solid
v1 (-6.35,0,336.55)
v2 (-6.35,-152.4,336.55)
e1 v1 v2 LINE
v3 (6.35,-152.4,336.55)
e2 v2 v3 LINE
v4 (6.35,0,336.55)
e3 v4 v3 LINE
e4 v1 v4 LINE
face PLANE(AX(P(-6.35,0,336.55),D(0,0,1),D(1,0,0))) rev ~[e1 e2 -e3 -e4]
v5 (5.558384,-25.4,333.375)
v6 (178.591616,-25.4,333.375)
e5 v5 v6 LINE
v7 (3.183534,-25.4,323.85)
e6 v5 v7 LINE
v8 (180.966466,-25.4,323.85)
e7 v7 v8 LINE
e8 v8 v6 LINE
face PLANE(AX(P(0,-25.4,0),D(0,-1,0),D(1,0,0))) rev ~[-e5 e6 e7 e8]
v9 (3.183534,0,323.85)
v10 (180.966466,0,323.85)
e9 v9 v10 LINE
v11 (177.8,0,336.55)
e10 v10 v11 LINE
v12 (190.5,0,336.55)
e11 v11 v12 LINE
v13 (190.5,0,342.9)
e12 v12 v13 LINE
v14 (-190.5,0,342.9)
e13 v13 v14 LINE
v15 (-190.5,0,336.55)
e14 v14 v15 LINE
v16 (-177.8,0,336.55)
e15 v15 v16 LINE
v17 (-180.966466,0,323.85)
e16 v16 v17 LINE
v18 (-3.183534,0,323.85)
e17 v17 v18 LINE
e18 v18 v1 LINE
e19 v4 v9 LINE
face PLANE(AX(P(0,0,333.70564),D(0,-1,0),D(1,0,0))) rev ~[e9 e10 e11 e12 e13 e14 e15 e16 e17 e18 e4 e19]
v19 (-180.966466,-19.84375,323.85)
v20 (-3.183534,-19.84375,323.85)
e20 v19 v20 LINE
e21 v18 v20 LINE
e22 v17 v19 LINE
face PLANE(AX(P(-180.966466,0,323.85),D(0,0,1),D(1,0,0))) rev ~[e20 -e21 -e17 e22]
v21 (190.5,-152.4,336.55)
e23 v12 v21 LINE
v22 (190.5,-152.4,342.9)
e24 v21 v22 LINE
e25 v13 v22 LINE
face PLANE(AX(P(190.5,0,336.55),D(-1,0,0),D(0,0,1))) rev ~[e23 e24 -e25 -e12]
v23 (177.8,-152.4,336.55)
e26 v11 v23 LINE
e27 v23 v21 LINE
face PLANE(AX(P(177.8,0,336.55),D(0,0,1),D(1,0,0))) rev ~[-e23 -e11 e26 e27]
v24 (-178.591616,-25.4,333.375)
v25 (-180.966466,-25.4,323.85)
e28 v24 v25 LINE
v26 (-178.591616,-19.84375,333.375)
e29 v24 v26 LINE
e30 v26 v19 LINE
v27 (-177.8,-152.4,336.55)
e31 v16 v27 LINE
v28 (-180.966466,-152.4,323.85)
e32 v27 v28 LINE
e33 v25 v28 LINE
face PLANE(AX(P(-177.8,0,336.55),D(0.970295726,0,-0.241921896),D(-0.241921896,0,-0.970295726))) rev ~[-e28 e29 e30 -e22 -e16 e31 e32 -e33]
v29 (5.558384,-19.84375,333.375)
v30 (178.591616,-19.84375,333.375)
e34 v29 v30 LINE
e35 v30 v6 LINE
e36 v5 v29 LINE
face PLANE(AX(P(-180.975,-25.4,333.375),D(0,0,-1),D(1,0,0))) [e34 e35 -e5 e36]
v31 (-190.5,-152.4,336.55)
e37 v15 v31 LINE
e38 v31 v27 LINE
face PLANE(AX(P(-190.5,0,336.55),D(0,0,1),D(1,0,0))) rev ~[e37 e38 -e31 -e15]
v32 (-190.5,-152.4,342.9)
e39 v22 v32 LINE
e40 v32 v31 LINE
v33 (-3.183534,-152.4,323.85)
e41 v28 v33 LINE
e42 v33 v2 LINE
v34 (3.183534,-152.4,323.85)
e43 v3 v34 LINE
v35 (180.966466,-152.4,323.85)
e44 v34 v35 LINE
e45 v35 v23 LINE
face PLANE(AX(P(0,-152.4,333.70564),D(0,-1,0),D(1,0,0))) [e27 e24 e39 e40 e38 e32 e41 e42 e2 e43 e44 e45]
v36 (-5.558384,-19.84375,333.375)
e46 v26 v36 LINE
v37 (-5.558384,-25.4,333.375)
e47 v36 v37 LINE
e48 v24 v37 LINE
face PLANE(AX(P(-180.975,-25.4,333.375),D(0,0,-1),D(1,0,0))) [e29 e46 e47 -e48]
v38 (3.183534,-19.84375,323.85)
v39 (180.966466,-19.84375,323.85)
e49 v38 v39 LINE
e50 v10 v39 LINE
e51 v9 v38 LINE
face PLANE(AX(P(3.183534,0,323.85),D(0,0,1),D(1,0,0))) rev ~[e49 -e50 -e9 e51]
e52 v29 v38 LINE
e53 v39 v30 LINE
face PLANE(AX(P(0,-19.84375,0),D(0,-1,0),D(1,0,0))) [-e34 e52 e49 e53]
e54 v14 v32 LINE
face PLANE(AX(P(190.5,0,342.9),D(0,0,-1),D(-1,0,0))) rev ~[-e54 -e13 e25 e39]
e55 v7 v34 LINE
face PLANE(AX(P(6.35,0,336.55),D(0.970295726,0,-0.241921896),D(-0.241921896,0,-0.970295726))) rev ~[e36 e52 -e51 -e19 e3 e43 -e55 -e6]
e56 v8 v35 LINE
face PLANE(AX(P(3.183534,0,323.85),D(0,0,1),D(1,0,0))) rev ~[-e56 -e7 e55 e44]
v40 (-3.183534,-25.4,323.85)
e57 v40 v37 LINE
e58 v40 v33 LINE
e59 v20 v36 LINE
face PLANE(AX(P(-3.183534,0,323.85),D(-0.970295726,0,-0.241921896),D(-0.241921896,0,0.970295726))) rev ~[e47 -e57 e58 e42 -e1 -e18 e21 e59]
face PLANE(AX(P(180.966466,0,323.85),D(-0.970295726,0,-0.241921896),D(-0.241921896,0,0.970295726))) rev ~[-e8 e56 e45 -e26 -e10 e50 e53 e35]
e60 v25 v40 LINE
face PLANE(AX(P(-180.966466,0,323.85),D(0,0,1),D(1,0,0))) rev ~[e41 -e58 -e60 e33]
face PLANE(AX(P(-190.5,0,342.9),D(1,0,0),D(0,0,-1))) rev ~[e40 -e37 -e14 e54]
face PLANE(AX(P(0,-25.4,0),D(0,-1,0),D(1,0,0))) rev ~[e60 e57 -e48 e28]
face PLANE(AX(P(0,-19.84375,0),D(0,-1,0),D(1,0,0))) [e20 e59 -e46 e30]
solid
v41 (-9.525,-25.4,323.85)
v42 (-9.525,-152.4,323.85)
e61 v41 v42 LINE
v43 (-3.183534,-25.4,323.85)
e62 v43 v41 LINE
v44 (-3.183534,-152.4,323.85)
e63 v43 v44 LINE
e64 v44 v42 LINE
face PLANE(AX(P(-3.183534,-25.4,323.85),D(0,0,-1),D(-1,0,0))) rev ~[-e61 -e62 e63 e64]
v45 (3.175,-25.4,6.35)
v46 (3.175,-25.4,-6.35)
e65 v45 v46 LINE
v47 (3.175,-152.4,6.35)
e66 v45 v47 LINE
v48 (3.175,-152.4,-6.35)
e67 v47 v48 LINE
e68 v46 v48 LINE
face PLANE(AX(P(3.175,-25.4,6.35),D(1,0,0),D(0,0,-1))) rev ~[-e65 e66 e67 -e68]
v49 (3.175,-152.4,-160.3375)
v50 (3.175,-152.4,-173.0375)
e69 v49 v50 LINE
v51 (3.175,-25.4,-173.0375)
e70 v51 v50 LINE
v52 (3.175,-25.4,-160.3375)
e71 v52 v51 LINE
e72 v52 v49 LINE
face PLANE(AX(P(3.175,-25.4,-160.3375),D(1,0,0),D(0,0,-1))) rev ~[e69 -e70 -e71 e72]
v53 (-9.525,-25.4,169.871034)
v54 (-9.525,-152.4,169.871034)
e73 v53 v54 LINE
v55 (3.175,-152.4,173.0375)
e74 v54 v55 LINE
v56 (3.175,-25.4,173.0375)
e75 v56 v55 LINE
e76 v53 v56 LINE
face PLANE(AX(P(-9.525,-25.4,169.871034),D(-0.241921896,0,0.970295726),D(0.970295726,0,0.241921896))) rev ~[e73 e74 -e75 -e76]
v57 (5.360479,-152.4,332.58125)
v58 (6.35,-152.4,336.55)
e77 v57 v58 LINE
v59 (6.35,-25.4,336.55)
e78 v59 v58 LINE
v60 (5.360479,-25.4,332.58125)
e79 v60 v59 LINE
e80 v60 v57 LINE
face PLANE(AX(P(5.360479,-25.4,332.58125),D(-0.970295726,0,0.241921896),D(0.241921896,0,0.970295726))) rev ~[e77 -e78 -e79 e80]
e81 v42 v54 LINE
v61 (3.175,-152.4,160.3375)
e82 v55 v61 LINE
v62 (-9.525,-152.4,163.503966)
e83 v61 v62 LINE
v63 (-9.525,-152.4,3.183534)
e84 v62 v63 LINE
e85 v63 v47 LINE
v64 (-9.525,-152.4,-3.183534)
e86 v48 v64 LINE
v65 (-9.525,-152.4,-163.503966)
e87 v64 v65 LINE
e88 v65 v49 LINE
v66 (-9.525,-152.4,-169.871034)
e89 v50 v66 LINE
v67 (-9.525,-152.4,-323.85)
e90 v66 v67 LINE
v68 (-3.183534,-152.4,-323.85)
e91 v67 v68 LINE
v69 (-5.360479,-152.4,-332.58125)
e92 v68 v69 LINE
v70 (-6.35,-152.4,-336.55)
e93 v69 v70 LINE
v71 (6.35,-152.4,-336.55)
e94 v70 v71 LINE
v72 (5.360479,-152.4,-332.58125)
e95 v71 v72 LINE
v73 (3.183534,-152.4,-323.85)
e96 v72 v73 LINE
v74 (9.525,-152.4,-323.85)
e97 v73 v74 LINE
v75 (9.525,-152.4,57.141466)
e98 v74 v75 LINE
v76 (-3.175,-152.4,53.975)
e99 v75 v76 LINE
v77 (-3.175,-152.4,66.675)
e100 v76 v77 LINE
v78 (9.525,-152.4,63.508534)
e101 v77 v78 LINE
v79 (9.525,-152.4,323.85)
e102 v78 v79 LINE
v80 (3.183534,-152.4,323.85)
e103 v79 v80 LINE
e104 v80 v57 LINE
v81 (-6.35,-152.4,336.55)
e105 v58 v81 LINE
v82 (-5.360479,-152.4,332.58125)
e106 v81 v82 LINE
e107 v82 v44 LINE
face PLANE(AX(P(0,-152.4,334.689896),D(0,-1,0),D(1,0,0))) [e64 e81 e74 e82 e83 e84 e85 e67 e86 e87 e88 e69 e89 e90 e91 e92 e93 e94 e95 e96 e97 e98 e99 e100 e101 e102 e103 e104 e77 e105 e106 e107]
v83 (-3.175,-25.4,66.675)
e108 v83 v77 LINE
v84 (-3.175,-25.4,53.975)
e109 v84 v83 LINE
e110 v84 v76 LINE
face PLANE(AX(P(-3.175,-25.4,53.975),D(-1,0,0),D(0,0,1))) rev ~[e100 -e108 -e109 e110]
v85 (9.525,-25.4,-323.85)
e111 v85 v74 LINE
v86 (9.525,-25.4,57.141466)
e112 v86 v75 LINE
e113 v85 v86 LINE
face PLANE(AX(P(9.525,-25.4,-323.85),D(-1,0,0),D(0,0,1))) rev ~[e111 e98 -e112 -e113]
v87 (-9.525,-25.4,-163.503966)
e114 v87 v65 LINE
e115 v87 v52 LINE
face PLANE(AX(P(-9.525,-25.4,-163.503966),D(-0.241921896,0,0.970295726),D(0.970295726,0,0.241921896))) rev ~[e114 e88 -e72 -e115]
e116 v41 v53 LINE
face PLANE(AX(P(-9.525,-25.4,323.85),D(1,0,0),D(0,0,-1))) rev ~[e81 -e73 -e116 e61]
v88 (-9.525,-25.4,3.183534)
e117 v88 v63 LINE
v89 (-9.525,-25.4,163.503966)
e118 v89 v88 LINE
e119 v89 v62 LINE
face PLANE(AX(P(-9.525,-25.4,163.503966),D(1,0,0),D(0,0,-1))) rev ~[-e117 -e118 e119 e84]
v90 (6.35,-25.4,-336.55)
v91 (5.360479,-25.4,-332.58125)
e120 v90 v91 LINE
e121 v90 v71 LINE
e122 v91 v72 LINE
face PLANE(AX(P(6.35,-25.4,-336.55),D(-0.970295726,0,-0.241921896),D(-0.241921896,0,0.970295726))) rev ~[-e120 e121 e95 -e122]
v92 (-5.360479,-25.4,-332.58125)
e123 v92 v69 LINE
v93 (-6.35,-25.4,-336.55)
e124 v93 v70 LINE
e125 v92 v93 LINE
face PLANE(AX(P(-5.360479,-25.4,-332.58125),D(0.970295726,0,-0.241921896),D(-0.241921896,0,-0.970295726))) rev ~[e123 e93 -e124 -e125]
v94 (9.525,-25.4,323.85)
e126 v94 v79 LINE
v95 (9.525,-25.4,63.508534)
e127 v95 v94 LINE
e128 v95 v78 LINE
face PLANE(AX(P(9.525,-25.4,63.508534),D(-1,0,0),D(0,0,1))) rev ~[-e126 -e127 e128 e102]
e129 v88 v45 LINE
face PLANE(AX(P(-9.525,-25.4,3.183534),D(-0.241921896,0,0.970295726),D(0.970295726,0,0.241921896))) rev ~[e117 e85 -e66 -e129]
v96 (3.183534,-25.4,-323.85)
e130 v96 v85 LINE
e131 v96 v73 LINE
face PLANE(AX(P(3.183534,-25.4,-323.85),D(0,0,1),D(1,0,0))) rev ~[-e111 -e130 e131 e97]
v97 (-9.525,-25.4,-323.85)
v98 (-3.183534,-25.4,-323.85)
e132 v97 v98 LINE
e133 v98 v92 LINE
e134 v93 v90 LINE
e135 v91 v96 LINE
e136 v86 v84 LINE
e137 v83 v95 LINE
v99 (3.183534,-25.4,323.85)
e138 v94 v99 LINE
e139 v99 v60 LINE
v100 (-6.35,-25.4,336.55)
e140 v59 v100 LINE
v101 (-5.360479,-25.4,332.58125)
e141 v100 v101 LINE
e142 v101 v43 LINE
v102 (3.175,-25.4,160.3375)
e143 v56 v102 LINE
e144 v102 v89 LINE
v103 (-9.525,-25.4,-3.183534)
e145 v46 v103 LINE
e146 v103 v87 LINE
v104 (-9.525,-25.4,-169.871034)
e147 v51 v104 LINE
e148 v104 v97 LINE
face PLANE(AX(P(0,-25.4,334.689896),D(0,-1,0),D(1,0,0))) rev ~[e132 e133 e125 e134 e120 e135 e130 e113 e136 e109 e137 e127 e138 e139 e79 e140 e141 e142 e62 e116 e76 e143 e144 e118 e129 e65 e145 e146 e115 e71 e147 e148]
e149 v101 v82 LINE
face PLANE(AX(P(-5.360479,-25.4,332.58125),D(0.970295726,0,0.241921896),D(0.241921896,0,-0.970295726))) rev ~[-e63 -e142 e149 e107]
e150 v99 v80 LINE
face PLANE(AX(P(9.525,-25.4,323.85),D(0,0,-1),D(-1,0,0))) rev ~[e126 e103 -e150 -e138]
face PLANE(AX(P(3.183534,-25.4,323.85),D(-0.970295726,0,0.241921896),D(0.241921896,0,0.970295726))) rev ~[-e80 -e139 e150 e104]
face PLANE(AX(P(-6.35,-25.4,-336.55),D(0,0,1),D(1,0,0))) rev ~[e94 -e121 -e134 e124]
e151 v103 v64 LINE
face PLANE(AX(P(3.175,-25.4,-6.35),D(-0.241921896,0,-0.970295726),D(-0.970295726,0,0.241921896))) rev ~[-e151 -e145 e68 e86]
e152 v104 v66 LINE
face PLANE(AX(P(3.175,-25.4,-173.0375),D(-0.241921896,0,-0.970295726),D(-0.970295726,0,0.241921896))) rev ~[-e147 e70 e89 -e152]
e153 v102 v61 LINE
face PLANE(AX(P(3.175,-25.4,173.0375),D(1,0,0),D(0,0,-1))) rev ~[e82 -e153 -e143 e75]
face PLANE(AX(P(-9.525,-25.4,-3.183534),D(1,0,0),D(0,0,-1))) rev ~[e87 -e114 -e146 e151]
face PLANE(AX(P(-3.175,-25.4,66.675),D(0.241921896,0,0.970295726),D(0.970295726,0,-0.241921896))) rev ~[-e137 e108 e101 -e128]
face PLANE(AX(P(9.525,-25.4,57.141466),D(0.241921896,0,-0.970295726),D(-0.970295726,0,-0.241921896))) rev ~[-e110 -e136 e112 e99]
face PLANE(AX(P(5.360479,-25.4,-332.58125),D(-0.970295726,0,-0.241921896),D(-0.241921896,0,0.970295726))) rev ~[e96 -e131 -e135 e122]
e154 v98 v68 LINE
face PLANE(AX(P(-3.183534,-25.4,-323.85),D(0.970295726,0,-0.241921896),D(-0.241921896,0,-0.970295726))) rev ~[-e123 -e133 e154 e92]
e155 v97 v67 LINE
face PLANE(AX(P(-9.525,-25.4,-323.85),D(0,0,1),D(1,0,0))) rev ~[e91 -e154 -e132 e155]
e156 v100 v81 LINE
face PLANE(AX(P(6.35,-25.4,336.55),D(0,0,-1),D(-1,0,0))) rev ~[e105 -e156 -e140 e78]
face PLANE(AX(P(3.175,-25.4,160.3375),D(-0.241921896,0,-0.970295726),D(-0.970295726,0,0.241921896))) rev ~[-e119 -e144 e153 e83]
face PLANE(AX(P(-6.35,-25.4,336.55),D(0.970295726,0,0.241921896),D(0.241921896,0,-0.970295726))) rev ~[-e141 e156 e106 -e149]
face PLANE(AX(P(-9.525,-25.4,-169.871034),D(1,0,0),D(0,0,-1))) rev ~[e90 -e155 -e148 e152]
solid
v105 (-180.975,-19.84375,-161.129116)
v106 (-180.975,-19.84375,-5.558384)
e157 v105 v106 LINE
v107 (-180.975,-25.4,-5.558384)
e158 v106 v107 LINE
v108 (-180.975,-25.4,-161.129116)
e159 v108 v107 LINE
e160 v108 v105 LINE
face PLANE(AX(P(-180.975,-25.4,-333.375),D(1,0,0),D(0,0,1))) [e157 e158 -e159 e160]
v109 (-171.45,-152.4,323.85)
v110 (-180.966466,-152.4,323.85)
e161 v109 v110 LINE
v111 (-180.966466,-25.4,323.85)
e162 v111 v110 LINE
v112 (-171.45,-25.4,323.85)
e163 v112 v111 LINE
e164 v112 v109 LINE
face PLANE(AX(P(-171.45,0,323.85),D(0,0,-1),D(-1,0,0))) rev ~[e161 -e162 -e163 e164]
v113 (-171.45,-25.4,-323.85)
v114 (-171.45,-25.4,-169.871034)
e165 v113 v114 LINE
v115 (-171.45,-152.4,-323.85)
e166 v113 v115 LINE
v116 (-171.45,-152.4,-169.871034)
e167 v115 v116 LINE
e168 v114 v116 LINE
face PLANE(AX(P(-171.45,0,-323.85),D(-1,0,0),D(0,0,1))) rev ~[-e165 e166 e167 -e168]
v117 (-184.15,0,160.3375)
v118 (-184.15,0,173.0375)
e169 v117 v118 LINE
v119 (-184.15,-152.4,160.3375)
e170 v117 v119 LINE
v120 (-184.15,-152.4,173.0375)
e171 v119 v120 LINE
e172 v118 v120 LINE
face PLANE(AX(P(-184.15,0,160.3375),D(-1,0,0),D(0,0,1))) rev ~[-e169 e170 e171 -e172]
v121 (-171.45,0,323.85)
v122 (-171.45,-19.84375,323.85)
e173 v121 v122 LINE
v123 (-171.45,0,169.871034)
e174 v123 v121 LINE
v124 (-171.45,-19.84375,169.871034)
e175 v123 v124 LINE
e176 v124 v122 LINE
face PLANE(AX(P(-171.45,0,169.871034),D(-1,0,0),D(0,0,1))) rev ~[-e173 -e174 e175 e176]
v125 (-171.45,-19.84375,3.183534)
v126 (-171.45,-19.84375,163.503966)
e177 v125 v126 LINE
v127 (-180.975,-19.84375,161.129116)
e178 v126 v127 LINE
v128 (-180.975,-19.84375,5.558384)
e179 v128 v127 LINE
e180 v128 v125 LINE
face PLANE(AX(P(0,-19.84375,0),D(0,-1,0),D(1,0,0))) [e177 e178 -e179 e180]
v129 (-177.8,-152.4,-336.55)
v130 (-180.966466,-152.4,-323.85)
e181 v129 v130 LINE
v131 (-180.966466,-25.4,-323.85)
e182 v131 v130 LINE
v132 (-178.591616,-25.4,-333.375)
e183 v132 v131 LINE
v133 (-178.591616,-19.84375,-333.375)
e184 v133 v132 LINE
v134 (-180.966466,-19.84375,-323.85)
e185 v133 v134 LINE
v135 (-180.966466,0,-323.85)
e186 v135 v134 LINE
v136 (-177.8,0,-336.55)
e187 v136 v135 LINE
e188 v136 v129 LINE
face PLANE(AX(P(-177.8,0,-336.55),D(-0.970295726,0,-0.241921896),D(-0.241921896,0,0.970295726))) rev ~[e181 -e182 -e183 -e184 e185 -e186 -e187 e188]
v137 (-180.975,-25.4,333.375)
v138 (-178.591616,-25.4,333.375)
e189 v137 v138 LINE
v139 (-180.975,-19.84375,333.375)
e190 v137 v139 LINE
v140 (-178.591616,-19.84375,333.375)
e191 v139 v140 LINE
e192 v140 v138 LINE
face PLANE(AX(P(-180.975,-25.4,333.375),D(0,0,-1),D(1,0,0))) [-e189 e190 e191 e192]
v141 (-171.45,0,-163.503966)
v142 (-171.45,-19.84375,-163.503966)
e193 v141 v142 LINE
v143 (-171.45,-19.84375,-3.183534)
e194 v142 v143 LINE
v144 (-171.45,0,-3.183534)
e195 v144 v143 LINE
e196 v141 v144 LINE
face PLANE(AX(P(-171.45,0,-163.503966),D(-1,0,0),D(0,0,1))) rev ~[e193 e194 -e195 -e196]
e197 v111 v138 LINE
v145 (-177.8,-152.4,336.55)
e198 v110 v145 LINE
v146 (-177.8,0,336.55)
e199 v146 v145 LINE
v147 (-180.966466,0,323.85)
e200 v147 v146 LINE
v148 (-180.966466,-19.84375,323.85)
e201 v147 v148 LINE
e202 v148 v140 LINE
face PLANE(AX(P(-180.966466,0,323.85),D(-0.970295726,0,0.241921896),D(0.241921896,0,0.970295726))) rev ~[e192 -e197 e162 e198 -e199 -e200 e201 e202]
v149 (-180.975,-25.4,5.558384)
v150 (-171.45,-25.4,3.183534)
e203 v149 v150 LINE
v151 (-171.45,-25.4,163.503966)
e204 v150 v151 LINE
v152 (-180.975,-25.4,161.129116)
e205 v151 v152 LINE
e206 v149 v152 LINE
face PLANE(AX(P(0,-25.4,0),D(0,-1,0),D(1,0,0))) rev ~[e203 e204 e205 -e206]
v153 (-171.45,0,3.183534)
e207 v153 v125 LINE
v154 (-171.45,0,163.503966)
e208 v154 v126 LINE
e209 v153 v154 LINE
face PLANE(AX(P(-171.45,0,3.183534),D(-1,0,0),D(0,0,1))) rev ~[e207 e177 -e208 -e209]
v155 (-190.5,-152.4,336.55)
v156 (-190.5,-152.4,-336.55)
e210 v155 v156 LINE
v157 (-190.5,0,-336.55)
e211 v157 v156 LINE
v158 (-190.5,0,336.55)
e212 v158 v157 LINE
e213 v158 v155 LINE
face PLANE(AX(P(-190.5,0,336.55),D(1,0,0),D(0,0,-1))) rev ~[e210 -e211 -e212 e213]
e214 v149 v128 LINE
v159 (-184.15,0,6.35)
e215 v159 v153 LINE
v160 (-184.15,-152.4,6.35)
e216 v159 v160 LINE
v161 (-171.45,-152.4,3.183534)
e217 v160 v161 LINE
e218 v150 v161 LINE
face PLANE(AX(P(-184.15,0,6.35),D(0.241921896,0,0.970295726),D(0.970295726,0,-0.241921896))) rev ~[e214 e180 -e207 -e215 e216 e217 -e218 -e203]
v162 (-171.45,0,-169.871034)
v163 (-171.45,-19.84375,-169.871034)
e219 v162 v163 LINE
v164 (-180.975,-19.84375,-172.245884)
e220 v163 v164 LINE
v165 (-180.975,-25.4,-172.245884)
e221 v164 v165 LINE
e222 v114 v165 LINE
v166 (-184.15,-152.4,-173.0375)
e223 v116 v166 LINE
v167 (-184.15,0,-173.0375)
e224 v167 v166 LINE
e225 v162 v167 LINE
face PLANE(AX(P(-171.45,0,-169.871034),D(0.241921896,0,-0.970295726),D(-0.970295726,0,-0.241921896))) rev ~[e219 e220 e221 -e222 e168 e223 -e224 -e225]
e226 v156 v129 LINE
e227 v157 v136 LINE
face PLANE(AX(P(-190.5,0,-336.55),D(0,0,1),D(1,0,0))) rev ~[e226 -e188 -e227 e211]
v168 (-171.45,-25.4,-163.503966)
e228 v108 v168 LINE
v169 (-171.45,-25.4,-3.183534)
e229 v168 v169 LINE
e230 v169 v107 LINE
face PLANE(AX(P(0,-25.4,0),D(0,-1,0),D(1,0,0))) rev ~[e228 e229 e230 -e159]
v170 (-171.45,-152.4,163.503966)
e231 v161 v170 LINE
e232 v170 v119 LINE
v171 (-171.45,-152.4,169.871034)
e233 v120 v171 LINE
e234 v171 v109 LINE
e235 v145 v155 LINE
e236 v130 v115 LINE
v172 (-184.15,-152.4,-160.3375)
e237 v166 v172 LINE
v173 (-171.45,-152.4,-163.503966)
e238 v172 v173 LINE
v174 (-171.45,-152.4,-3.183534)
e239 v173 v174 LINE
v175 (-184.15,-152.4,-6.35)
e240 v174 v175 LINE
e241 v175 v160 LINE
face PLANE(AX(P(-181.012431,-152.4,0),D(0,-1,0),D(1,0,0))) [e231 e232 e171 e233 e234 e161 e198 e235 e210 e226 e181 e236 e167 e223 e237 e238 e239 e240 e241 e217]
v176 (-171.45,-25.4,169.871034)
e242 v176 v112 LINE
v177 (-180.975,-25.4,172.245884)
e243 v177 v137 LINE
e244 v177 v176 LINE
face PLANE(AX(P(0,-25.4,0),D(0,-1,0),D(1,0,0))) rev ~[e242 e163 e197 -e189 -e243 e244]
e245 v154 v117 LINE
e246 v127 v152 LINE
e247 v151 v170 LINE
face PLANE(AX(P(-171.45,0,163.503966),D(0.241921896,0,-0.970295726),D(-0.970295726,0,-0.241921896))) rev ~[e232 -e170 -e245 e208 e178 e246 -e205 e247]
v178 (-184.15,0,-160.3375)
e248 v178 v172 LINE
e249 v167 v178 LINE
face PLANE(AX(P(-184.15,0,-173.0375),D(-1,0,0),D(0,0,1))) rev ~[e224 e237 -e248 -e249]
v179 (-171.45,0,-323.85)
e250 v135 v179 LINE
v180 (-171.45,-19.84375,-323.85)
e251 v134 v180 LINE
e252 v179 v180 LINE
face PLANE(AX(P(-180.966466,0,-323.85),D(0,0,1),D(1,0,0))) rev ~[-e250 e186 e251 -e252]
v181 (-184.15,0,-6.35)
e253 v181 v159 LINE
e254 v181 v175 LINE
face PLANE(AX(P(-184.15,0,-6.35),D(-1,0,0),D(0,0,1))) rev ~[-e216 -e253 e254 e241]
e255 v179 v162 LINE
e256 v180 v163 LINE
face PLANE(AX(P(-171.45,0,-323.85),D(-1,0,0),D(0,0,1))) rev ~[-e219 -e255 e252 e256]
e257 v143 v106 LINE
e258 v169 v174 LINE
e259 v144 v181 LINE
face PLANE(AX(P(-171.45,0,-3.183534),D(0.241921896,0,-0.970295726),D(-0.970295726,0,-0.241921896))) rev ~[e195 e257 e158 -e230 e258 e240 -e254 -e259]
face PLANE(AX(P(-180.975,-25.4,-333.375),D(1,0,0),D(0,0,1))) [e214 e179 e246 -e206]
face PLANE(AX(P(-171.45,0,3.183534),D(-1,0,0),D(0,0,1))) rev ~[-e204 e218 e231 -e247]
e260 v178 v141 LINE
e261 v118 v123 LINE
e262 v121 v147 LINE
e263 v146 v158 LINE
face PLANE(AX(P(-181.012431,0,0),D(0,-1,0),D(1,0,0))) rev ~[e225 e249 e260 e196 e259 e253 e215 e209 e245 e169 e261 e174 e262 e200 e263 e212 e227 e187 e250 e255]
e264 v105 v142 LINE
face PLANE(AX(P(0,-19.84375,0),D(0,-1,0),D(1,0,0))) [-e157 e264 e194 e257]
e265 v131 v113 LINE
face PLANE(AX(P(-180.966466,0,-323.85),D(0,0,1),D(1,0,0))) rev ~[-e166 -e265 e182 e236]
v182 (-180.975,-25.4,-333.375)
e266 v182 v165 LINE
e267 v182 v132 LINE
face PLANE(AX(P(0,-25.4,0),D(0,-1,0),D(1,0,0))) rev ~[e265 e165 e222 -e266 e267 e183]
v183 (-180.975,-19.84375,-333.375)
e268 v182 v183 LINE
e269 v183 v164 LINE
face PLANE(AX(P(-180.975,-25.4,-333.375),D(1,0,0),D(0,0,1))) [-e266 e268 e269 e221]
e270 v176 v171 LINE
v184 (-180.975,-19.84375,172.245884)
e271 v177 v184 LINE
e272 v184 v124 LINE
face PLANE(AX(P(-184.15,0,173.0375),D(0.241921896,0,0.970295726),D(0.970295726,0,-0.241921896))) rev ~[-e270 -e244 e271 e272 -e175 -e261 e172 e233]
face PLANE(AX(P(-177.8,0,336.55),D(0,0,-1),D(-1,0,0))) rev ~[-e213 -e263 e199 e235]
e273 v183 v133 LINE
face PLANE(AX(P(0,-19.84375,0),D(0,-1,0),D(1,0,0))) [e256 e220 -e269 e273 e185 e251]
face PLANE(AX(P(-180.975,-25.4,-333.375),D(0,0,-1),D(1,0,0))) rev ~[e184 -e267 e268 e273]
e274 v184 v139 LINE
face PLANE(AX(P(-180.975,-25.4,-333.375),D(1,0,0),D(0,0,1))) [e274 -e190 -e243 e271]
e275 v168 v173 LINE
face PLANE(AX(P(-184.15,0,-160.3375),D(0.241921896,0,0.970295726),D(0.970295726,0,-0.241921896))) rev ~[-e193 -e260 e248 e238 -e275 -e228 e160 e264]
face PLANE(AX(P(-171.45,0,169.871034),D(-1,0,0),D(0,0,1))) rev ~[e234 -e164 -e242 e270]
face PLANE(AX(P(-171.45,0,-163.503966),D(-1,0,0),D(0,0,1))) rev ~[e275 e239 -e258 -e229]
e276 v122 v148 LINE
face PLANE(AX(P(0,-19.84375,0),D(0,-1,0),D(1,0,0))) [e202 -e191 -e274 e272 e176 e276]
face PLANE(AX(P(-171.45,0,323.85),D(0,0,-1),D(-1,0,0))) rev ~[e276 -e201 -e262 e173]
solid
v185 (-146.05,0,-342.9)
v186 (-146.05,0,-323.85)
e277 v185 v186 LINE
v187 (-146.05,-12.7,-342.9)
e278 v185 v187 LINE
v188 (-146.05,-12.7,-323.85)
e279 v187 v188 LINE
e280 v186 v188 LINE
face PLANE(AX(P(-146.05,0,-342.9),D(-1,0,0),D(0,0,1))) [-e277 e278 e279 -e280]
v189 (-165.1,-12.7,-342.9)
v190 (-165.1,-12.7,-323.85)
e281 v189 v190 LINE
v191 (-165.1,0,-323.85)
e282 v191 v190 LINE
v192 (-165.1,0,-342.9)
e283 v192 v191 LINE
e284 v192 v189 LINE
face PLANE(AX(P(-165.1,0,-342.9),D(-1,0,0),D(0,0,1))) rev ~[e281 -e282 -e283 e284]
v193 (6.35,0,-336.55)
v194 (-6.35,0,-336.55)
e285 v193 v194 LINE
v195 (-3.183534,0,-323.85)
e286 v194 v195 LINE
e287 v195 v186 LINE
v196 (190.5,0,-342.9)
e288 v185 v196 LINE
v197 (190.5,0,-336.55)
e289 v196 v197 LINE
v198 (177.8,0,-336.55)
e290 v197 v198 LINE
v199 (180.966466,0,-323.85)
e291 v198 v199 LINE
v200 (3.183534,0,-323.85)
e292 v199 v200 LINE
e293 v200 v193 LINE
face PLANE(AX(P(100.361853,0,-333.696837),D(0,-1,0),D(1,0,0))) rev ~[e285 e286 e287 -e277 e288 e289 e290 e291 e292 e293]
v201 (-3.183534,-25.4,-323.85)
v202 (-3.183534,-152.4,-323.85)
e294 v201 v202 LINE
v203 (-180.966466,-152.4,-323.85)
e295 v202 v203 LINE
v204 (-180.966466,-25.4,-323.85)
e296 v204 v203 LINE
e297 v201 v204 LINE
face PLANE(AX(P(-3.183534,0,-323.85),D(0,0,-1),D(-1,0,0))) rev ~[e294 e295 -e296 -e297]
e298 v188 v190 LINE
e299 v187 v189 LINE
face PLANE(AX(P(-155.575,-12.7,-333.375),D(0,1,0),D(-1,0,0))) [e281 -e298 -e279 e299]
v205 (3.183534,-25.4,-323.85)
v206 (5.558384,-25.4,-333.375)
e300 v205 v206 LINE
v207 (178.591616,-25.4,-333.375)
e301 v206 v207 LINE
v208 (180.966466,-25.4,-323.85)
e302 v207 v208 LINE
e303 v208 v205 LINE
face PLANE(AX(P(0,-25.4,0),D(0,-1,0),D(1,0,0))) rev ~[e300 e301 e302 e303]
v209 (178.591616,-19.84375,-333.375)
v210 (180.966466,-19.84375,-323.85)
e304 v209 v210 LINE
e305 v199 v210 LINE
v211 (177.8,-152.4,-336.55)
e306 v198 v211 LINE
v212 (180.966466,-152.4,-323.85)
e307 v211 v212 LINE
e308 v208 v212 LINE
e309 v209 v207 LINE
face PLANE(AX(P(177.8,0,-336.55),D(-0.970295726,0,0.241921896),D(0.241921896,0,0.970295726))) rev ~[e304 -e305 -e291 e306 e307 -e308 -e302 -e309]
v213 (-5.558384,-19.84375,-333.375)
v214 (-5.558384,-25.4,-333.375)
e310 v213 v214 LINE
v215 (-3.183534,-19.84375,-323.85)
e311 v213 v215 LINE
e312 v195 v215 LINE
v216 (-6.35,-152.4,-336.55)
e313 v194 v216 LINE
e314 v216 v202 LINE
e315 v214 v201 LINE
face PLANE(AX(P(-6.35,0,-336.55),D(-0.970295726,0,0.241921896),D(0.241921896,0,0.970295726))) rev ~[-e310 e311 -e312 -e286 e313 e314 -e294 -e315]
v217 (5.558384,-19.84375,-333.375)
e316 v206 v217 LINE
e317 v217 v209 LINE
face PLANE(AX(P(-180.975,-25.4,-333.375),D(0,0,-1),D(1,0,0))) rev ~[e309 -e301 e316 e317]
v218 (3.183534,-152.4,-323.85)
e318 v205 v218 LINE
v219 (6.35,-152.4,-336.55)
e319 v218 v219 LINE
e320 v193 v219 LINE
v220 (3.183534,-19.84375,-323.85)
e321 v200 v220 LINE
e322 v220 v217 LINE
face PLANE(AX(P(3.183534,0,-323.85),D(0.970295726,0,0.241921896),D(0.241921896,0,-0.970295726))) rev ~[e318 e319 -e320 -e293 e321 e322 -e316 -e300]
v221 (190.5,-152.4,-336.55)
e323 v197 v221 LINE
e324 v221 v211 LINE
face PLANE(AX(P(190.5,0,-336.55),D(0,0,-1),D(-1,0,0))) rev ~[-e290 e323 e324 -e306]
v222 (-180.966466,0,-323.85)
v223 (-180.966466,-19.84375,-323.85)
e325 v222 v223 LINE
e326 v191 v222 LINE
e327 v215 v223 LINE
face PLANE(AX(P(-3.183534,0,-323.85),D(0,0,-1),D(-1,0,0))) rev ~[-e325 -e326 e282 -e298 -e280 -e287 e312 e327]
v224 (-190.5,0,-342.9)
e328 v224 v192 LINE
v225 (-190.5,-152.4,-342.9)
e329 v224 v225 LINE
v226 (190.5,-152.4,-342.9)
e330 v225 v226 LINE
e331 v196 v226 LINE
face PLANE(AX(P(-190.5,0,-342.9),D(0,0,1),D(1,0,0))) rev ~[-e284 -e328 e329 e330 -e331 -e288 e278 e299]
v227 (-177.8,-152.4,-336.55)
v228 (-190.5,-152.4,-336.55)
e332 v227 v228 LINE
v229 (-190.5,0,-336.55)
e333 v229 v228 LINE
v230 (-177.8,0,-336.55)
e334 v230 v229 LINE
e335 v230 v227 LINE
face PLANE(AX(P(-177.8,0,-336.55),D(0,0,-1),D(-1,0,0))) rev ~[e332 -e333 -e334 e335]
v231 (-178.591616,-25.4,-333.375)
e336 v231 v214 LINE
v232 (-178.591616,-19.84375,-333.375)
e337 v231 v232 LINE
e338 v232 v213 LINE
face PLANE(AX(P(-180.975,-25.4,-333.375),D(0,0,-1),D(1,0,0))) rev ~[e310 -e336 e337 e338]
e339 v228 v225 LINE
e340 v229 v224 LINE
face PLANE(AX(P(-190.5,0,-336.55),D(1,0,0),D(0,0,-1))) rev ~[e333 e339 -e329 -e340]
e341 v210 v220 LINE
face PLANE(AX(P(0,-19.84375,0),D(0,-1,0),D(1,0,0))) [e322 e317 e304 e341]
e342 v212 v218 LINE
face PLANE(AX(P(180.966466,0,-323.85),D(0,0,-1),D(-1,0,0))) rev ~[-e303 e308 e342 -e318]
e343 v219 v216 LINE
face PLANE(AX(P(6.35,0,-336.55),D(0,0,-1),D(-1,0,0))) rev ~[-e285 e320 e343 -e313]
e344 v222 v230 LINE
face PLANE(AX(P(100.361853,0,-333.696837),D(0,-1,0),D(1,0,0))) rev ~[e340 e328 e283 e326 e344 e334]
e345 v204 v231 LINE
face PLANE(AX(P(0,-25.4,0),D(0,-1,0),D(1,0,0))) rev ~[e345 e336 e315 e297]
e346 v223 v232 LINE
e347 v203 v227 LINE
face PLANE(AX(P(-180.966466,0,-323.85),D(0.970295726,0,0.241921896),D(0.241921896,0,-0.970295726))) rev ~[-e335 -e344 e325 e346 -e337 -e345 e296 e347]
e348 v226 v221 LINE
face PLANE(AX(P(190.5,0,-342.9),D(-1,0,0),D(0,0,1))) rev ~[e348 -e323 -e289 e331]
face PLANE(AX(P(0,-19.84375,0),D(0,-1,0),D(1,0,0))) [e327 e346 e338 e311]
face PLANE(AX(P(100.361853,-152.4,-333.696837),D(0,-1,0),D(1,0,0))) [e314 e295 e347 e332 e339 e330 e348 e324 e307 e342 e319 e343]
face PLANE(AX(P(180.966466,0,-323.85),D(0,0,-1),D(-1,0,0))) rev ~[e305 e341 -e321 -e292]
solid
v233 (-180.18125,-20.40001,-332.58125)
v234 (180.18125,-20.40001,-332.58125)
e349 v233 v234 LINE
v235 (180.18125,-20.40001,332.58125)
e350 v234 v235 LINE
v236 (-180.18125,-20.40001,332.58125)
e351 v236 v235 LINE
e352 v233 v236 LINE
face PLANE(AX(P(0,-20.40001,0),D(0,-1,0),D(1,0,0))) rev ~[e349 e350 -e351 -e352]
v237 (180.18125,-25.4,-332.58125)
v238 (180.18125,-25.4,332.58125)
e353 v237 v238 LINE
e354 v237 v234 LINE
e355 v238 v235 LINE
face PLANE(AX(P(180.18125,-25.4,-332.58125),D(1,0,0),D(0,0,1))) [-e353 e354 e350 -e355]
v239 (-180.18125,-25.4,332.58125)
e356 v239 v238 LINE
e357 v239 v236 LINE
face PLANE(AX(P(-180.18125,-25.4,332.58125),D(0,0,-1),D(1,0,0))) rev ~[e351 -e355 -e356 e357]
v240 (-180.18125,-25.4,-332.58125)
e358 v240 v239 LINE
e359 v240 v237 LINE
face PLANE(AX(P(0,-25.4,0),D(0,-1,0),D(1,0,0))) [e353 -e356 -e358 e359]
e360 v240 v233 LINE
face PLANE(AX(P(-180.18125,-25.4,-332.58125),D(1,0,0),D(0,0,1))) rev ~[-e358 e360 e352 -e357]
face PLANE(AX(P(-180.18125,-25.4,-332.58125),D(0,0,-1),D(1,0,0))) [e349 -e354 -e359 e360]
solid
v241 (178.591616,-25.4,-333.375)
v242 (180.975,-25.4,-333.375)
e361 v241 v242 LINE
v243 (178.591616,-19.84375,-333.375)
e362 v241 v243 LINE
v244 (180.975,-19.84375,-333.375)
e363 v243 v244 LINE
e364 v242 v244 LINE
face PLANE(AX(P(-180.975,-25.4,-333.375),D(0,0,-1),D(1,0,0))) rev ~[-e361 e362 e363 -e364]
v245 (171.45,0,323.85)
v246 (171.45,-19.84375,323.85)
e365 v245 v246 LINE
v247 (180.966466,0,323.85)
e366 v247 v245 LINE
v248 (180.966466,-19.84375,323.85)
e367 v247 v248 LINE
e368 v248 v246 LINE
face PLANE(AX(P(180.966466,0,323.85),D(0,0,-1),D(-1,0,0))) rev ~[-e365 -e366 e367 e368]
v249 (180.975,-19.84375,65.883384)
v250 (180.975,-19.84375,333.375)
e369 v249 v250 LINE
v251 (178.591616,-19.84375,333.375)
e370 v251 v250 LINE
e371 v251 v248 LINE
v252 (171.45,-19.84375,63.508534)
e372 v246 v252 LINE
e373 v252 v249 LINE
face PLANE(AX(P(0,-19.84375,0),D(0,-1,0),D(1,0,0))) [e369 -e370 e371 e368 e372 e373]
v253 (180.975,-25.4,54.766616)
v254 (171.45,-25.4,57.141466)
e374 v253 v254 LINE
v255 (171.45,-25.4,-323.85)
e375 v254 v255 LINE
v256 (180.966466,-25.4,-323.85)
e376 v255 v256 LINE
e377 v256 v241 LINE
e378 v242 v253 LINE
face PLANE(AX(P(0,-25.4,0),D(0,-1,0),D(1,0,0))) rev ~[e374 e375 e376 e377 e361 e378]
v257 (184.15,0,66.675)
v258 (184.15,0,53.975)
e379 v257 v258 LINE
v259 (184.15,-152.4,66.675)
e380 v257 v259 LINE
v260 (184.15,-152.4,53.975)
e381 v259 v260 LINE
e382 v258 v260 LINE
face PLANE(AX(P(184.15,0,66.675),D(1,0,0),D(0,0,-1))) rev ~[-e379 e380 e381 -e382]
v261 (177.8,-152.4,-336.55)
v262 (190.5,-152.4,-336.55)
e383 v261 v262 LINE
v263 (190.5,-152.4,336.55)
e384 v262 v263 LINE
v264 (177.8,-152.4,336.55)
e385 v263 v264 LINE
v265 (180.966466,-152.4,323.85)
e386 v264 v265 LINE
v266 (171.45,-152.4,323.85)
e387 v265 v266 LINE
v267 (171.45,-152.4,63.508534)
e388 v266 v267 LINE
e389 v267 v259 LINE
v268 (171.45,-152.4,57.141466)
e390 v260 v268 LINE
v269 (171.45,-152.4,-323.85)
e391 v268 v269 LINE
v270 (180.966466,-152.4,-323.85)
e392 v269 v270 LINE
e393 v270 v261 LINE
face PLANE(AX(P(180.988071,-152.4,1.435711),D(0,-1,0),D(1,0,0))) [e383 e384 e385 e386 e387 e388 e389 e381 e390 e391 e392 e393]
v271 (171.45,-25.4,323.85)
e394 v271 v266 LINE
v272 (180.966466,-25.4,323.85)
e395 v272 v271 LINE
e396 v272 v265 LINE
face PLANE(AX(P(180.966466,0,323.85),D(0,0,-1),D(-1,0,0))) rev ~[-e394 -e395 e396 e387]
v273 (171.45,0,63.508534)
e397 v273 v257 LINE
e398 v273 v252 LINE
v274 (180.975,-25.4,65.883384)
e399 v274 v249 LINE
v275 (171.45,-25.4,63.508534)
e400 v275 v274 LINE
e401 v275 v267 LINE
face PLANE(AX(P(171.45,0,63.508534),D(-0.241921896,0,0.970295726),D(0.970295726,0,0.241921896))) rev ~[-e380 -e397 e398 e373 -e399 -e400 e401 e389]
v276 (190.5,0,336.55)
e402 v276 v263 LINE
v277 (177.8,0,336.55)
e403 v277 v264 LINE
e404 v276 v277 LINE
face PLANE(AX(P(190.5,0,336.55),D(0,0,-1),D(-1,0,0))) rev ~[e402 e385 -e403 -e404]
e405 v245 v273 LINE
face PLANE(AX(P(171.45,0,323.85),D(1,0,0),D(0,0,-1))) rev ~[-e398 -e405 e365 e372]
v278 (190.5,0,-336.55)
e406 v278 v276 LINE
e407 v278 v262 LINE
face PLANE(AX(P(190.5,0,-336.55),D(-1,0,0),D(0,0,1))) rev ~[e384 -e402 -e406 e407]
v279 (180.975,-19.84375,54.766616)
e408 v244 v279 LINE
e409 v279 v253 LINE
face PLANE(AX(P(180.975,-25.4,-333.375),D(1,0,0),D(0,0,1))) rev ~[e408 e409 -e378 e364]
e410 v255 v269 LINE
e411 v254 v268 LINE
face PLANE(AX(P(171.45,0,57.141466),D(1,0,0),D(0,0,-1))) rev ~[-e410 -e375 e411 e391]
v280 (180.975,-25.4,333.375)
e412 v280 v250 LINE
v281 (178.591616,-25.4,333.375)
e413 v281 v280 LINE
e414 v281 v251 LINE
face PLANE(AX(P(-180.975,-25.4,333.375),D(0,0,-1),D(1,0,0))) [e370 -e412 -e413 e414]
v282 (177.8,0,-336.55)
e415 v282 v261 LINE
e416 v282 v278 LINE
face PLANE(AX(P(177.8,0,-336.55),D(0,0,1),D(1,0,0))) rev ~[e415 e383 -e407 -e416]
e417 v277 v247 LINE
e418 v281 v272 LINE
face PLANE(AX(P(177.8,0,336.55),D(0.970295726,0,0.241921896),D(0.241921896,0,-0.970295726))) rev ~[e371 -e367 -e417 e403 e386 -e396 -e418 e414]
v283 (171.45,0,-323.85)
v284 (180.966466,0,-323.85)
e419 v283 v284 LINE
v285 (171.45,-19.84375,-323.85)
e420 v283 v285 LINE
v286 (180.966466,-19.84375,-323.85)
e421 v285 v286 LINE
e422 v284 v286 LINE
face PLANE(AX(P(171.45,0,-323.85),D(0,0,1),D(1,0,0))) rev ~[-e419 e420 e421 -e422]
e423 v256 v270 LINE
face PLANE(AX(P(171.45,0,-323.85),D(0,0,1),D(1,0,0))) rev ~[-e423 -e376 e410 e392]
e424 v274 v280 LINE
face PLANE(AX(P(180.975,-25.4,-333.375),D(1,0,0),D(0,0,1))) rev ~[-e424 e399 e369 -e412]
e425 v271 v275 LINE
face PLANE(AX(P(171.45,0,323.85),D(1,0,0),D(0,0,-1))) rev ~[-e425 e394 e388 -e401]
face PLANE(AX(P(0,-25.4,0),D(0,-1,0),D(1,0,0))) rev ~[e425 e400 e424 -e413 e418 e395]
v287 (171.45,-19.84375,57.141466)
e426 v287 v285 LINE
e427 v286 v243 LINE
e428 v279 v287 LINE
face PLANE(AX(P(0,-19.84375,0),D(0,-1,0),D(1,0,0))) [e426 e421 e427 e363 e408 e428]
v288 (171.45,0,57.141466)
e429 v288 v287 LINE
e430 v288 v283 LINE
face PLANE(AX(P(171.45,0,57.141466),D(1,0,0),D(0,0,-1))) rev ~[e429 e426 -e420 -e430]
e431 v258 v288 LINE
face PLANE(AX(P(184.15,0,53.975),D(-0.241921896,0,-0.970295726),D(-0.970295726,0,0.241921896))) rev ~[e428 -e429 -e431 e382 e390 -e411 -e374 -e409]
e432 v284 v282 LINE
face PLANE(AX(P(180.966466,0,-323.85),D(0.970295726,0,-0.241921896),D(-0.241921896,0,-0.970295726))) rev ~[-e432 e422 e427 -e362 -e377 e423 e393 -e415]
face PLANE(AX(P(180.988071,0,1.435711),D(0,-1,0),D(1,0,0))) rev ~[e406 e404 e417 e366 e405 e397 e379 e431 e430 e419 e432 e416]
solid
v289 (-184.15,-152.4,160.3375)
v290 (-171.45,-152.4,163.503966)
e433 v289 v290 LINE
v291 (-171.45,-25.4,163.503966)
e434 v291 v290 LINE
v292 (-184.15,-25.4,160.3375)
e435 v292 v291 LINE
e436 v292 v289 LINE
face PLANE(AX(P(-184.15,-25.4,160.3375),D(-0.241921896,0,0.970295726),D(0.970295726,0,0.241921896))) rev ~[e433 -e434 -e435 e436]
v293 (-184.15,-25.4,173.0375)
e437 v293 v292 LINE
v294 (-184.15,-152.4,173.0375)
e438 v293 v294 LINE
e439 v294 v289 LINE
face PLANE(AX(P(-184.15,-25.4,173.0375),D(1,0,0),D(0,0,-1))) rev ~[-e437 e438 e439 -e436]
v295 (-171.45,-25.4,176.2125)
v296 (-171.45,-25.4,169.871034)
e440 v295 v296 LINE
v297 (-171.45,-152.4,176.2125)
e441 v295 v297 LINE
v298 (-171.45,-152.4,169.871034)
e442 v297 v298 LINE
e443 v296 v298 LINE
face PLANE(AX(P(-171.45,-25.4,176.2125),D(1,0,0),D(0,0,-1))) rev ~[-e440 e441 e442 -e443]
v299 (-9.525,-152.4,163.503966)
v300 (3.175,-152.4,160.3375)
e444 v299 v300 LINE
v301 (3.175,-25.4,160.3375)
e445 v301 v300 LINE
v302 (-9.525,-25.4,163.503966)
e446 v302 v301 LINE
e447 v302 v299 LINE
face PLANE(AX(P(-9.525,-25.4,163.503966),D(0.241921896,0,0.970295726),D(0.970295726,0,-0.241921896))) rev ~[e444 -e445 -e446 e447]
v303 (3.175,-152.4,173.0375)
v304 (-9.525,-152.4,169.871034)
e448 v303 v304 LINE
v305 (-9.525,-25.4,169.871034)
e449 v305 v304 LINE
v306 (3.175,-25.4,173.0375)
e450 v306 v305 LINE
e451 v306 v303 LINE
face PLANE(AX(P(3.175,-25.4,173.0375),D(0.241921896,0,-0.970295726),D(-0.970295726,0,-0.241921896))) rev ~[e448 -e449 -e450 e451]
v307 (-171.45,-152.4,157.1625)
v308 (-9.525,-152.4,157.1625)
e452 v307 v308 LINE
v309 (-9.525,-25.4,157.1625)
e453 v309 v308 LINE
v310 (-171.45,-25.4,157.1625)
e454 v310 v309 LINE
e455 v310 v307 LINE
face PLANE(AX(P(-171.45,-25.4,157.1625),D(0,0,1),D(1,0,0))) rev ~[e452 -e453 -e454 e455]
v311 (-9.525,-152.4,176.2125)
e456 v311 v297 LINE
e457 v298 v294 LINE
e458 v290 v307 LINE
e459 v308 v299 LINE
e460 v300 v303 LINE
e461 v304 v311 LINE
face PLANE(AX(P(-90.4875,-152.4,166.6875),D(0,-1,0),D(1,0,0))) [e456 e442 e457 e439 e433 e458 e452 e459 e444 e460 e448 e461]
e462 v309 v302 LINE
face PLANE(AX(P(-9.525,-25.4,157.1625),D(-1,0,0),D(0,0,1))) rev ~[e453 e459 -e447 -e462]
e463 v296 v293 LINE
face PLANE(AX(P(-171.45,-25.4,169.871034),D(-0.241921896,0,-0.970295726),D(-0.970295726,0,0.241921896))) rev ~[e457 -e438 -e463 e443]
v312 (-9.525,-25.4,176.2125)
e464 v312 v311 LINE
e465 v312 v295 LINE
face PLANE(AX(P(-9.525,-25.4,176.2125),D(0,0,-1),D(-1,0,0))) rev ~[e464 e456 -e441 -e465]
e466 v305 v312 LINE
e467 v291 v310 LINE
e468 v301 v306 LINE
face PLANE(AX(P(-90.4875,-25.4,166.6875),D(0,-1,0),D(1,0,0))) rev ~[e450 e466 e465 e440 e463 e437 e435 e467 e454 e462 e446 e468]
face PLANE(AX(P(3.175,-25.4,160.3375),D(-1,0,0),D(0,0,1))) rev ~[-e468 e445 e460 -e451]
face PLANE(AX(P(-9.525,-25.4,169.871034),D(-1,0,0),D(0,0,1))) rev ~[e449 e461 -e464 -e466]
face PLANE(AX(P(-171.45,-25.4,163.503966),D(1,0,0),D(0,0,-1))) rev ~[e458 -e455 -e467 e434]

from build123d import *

# Parameters (mm, degrees)
F1_DEPTH  = 152.4
F2_DEPTH  = 152.4
F3_W      = 19.05
F3_H      = 19.05
F4_DEPTH  = 12.7
F6_W      = 361.95
F6_H      = 666.75
F7_DEPTH  = 5.55625
F8_W      = 360.3625
F8_H      = 665.1625
F9_DEPTH  = 4.99999
F11_DEPTH = 127
F13_DEPTH = 127


# Not quite as in the source:
# - a feature names something its author has since deleted; it is built from what else it names


with BuildPart() as f1:
    # F0 (on Front) → F1 (new body)
    with BuildSketch(Plane.XZ):
        Polygon((-180.9664656361, 323.85), (-190.5, 323.85), (-190.5, -323.85), (-180.9664656361, -323.85), (-171.45, -323.85), (-171.45, -176.2125), (-171.45, -169.8710343639), (-184.15, -173.0375), (-184.15, -160.3375), (-171.45, -163.5039656361), (-171.45, -157.1625), (-171.45, -9.525), (-171.45, -3.1835343639), (-184.15, -6.35), (-184.15, 6.35), (-171.45, 3.1835343639), (-171.45, 9.525), (-171.45, 157.1625), (-171.45, 163.5039656361), (-184.15, 160.3375), (-184.15, 173.0375), (-171.45, 169.8710343639), (-171.45, 176.2125), (-171.45, 323.85), align=None)
        Polygon((-177.8, 336.55), (-190.5, 336.55), (-190.5, 323.85), (-180.9664656361, 323.85), align=None)
        Polygon((-180.9664656361, -323.85), (-190.5, -323.85), (-190.5, -336.55), (-177.8, -336.55), align=None)
    extrude(amount=F1_DEPTH)


with BuildPart() as f1b:
    # F0 (on Front) → F1, piece 2 (new body)
    with BuildSketch(Plane.XZ):
        Polygon((190.5, -323.85), (190.5, 323.85), (180.9664656361, 323.85), (171.45, 323.85), (171.45, 69.85), (171.45, 63.5085343639), (184.15, 66.675), (184.15, 53.975), (171.45, 57.1414656361), (171.45, 50.8), (171.45, -323.85), (180.9664656361, -323.85), align=None)
        Polygon((190.5, -336.55), (190.5, -323.85), (180.9664656361, -323.85), (177.8, -336.55), align=None)
        Polygon((190.5, 323.85), (190.5, 336.55), (177.8, 336.55), (180.9664656361, 323.85), align=None)
    extrude(amount=F1_DEPTH)


with BuildPart() as f2:
    # F0 (on Front) → F2 (new body, through all)
    with BuildSketch(Plane.XZ):
        Polygon((190.5, 336.55), (190.5, 342.9), (-190.5, 342.9), (-190.5, 336.55), (-177.8, 336.55), (-180.9664656361, 323.85), (-171.45, 323.85), (-9.525, 323.85), (-3.1835343639, 323.85), (-6.35, 336.55), (6.35, 336.55), (3.1835343639, 323.85), (9.525, 323.85), (171.45, 323.85), (180.9664656361, 323.85), (177.8, 336.55), align=None)
    extrude(amount=F2_DEPTH)


with BuildPart() as f2b:
    # F0 (on Front) → F2, piece 2 (new body, through all)
    with BuildSketch(Plane.XZ):
        Polygon((190.5, -342.9), (190.5, -336.55), (177.8, -336.55), (180.9664656361, -323.85), (171.45, -323.85), (9.525, -323.85), (9.525, -342.9), align=None)
        Polygon((-9.525, -342.9), (9.525, -342.9), (9.525, -323.85), (3.1835343639, -323.85), (6.35, -336.55), (-6.35, -336.55), (-3.1835343639, -323.85), (-9.525, -323.85), align=None)
        Polygon((-177.8, -336.55), (-190.5, -336.55), (-190.5, -342.9), (-9.525, -342.9), (-9.525, -323.85), (-171.45, -323.85), (-180.9664656361, -323.85), align=None)
    extrude(amount=F2_DEPTH)

    # F3 (on face) → F4 (cut)
    with BuildSketch(Plane(origin=(0, 0, 0), x_dir=(-1, 0, 0), z_dir=(0, 1, 0))):
        with Locations((155.575, -333.375)):
            Rectangle(F3_W, F3_H)
    extrude(amount=-F4_DEPTH, mode=Mode.SUBTRACT)


with BuildPart() as f7_tool:
    # F6 (on offset) → F7 (new body)
    with BuildSketch(Plane.XZ.offset(25.4)):
        Rectangle(F6_W, F6_H)
    extrude(amount=-F7_DEPTH)


with BuildPart() as f1_1:
    add(f1.part)

    # F7: cut by f7_tool
    add(f7_tool.part, mode=Mode.SUBTRACT)


with BuildPart() as f1b_1:
    add(f1b.part)

    # F7: cut by f7_tool
    add(f7_tool.part, mode=Mode.SUBTRACT)


with BuildPart() as f2_1:
    add(f2.part)

    # F7: cut by f7_tool
    add(f7_tool.part, mode=Mode.SUBTRACT)


with BuildPart() as f2b_1:
    add(f2b.part)

    # F7: cut by f7_tool
    add(f7_tool.part, mode=Mode.SUBTRACT)


with BuildPart() as f9:
    # F8 (on offset) → F9 (new body)
    with BuildSketch(Plane.XZ.offset(25.4)):
        Rectangle(F8_W, F8_H)
    extrude(amount=-F9_DEPTH)


with BuildPart() as f11:
    # F10 (on face) → F11 (new body, through all)
    with BuildSketch(Plane.XZ.offset(25.4)):
        Polygon((-5.3604794887, 332.58125), (5.3604794887, 332.58125), (6.35, 336.55), (-6.35, 336.55), align=None)
        Polygon((6.35, -336.55), (5.3604794887, -332.58125), (-5.3604794887, -332.58125), (-6.35, -336.55), align=None)
        Polygon((9.525, 63.5085343639), (9.525, 323.85), (3.1835343639, 323.85), (5.3604794887, 332.58125), (-5.3604794887, 332.58125), (-3.1835343639, 323.85), (-9.525, 323.85), (-9.525, 169.8710343639), (3.175, 173.0375), (3.175, 160.3375), (-9.525, 163.5039656361), (-9.525, 3.1835343639), (3.175, 6.35), (3.175, -6.35), (-9.525, -3.1835343639), (-9.525, -163.5039656361), (3.175, -160.3375), (3.175, -173.0375), (-9.525, -169.8710343639), (-9.525, -323.85), (-3.1835343639, -323.85), (-5.3604794887, -332.58125), (5.3604794887, -332.58125), (3.1835343639, -323.85), (9.525, -323.85), (9.525, 57.1414656361), (-3.175, 53.975), (-3.175, 66.675), align=None)
    extrude(amount=F11_DEPTH)


with BuildPart() as f13:
    # F12 (on face) → F13 (new body, through all)
    with BuildSketch(Plane.XZ.offset(25.4)):
        Polygon((-9.525, 169.8710343639), (-9.525, 176.2125), (-171.45, 176.2125), (-171.45, 169.8710343639), (-184.15, 173.0375), (-184.15, 160.3375), (-171.45, 163.5039656361), (-171.45, 157.1625), (-9.525, 157.1625), (-9.525, 163.5039656361), (3.175, 160.3375), (3.175, 173.0375), align=None)
    extrude(amount=F13_DEPTH)


solid = Compound([f1_1.part, f1b_1.part, f2_1.part, f2b_1.part, f9.part, f11.part, f13.part])
